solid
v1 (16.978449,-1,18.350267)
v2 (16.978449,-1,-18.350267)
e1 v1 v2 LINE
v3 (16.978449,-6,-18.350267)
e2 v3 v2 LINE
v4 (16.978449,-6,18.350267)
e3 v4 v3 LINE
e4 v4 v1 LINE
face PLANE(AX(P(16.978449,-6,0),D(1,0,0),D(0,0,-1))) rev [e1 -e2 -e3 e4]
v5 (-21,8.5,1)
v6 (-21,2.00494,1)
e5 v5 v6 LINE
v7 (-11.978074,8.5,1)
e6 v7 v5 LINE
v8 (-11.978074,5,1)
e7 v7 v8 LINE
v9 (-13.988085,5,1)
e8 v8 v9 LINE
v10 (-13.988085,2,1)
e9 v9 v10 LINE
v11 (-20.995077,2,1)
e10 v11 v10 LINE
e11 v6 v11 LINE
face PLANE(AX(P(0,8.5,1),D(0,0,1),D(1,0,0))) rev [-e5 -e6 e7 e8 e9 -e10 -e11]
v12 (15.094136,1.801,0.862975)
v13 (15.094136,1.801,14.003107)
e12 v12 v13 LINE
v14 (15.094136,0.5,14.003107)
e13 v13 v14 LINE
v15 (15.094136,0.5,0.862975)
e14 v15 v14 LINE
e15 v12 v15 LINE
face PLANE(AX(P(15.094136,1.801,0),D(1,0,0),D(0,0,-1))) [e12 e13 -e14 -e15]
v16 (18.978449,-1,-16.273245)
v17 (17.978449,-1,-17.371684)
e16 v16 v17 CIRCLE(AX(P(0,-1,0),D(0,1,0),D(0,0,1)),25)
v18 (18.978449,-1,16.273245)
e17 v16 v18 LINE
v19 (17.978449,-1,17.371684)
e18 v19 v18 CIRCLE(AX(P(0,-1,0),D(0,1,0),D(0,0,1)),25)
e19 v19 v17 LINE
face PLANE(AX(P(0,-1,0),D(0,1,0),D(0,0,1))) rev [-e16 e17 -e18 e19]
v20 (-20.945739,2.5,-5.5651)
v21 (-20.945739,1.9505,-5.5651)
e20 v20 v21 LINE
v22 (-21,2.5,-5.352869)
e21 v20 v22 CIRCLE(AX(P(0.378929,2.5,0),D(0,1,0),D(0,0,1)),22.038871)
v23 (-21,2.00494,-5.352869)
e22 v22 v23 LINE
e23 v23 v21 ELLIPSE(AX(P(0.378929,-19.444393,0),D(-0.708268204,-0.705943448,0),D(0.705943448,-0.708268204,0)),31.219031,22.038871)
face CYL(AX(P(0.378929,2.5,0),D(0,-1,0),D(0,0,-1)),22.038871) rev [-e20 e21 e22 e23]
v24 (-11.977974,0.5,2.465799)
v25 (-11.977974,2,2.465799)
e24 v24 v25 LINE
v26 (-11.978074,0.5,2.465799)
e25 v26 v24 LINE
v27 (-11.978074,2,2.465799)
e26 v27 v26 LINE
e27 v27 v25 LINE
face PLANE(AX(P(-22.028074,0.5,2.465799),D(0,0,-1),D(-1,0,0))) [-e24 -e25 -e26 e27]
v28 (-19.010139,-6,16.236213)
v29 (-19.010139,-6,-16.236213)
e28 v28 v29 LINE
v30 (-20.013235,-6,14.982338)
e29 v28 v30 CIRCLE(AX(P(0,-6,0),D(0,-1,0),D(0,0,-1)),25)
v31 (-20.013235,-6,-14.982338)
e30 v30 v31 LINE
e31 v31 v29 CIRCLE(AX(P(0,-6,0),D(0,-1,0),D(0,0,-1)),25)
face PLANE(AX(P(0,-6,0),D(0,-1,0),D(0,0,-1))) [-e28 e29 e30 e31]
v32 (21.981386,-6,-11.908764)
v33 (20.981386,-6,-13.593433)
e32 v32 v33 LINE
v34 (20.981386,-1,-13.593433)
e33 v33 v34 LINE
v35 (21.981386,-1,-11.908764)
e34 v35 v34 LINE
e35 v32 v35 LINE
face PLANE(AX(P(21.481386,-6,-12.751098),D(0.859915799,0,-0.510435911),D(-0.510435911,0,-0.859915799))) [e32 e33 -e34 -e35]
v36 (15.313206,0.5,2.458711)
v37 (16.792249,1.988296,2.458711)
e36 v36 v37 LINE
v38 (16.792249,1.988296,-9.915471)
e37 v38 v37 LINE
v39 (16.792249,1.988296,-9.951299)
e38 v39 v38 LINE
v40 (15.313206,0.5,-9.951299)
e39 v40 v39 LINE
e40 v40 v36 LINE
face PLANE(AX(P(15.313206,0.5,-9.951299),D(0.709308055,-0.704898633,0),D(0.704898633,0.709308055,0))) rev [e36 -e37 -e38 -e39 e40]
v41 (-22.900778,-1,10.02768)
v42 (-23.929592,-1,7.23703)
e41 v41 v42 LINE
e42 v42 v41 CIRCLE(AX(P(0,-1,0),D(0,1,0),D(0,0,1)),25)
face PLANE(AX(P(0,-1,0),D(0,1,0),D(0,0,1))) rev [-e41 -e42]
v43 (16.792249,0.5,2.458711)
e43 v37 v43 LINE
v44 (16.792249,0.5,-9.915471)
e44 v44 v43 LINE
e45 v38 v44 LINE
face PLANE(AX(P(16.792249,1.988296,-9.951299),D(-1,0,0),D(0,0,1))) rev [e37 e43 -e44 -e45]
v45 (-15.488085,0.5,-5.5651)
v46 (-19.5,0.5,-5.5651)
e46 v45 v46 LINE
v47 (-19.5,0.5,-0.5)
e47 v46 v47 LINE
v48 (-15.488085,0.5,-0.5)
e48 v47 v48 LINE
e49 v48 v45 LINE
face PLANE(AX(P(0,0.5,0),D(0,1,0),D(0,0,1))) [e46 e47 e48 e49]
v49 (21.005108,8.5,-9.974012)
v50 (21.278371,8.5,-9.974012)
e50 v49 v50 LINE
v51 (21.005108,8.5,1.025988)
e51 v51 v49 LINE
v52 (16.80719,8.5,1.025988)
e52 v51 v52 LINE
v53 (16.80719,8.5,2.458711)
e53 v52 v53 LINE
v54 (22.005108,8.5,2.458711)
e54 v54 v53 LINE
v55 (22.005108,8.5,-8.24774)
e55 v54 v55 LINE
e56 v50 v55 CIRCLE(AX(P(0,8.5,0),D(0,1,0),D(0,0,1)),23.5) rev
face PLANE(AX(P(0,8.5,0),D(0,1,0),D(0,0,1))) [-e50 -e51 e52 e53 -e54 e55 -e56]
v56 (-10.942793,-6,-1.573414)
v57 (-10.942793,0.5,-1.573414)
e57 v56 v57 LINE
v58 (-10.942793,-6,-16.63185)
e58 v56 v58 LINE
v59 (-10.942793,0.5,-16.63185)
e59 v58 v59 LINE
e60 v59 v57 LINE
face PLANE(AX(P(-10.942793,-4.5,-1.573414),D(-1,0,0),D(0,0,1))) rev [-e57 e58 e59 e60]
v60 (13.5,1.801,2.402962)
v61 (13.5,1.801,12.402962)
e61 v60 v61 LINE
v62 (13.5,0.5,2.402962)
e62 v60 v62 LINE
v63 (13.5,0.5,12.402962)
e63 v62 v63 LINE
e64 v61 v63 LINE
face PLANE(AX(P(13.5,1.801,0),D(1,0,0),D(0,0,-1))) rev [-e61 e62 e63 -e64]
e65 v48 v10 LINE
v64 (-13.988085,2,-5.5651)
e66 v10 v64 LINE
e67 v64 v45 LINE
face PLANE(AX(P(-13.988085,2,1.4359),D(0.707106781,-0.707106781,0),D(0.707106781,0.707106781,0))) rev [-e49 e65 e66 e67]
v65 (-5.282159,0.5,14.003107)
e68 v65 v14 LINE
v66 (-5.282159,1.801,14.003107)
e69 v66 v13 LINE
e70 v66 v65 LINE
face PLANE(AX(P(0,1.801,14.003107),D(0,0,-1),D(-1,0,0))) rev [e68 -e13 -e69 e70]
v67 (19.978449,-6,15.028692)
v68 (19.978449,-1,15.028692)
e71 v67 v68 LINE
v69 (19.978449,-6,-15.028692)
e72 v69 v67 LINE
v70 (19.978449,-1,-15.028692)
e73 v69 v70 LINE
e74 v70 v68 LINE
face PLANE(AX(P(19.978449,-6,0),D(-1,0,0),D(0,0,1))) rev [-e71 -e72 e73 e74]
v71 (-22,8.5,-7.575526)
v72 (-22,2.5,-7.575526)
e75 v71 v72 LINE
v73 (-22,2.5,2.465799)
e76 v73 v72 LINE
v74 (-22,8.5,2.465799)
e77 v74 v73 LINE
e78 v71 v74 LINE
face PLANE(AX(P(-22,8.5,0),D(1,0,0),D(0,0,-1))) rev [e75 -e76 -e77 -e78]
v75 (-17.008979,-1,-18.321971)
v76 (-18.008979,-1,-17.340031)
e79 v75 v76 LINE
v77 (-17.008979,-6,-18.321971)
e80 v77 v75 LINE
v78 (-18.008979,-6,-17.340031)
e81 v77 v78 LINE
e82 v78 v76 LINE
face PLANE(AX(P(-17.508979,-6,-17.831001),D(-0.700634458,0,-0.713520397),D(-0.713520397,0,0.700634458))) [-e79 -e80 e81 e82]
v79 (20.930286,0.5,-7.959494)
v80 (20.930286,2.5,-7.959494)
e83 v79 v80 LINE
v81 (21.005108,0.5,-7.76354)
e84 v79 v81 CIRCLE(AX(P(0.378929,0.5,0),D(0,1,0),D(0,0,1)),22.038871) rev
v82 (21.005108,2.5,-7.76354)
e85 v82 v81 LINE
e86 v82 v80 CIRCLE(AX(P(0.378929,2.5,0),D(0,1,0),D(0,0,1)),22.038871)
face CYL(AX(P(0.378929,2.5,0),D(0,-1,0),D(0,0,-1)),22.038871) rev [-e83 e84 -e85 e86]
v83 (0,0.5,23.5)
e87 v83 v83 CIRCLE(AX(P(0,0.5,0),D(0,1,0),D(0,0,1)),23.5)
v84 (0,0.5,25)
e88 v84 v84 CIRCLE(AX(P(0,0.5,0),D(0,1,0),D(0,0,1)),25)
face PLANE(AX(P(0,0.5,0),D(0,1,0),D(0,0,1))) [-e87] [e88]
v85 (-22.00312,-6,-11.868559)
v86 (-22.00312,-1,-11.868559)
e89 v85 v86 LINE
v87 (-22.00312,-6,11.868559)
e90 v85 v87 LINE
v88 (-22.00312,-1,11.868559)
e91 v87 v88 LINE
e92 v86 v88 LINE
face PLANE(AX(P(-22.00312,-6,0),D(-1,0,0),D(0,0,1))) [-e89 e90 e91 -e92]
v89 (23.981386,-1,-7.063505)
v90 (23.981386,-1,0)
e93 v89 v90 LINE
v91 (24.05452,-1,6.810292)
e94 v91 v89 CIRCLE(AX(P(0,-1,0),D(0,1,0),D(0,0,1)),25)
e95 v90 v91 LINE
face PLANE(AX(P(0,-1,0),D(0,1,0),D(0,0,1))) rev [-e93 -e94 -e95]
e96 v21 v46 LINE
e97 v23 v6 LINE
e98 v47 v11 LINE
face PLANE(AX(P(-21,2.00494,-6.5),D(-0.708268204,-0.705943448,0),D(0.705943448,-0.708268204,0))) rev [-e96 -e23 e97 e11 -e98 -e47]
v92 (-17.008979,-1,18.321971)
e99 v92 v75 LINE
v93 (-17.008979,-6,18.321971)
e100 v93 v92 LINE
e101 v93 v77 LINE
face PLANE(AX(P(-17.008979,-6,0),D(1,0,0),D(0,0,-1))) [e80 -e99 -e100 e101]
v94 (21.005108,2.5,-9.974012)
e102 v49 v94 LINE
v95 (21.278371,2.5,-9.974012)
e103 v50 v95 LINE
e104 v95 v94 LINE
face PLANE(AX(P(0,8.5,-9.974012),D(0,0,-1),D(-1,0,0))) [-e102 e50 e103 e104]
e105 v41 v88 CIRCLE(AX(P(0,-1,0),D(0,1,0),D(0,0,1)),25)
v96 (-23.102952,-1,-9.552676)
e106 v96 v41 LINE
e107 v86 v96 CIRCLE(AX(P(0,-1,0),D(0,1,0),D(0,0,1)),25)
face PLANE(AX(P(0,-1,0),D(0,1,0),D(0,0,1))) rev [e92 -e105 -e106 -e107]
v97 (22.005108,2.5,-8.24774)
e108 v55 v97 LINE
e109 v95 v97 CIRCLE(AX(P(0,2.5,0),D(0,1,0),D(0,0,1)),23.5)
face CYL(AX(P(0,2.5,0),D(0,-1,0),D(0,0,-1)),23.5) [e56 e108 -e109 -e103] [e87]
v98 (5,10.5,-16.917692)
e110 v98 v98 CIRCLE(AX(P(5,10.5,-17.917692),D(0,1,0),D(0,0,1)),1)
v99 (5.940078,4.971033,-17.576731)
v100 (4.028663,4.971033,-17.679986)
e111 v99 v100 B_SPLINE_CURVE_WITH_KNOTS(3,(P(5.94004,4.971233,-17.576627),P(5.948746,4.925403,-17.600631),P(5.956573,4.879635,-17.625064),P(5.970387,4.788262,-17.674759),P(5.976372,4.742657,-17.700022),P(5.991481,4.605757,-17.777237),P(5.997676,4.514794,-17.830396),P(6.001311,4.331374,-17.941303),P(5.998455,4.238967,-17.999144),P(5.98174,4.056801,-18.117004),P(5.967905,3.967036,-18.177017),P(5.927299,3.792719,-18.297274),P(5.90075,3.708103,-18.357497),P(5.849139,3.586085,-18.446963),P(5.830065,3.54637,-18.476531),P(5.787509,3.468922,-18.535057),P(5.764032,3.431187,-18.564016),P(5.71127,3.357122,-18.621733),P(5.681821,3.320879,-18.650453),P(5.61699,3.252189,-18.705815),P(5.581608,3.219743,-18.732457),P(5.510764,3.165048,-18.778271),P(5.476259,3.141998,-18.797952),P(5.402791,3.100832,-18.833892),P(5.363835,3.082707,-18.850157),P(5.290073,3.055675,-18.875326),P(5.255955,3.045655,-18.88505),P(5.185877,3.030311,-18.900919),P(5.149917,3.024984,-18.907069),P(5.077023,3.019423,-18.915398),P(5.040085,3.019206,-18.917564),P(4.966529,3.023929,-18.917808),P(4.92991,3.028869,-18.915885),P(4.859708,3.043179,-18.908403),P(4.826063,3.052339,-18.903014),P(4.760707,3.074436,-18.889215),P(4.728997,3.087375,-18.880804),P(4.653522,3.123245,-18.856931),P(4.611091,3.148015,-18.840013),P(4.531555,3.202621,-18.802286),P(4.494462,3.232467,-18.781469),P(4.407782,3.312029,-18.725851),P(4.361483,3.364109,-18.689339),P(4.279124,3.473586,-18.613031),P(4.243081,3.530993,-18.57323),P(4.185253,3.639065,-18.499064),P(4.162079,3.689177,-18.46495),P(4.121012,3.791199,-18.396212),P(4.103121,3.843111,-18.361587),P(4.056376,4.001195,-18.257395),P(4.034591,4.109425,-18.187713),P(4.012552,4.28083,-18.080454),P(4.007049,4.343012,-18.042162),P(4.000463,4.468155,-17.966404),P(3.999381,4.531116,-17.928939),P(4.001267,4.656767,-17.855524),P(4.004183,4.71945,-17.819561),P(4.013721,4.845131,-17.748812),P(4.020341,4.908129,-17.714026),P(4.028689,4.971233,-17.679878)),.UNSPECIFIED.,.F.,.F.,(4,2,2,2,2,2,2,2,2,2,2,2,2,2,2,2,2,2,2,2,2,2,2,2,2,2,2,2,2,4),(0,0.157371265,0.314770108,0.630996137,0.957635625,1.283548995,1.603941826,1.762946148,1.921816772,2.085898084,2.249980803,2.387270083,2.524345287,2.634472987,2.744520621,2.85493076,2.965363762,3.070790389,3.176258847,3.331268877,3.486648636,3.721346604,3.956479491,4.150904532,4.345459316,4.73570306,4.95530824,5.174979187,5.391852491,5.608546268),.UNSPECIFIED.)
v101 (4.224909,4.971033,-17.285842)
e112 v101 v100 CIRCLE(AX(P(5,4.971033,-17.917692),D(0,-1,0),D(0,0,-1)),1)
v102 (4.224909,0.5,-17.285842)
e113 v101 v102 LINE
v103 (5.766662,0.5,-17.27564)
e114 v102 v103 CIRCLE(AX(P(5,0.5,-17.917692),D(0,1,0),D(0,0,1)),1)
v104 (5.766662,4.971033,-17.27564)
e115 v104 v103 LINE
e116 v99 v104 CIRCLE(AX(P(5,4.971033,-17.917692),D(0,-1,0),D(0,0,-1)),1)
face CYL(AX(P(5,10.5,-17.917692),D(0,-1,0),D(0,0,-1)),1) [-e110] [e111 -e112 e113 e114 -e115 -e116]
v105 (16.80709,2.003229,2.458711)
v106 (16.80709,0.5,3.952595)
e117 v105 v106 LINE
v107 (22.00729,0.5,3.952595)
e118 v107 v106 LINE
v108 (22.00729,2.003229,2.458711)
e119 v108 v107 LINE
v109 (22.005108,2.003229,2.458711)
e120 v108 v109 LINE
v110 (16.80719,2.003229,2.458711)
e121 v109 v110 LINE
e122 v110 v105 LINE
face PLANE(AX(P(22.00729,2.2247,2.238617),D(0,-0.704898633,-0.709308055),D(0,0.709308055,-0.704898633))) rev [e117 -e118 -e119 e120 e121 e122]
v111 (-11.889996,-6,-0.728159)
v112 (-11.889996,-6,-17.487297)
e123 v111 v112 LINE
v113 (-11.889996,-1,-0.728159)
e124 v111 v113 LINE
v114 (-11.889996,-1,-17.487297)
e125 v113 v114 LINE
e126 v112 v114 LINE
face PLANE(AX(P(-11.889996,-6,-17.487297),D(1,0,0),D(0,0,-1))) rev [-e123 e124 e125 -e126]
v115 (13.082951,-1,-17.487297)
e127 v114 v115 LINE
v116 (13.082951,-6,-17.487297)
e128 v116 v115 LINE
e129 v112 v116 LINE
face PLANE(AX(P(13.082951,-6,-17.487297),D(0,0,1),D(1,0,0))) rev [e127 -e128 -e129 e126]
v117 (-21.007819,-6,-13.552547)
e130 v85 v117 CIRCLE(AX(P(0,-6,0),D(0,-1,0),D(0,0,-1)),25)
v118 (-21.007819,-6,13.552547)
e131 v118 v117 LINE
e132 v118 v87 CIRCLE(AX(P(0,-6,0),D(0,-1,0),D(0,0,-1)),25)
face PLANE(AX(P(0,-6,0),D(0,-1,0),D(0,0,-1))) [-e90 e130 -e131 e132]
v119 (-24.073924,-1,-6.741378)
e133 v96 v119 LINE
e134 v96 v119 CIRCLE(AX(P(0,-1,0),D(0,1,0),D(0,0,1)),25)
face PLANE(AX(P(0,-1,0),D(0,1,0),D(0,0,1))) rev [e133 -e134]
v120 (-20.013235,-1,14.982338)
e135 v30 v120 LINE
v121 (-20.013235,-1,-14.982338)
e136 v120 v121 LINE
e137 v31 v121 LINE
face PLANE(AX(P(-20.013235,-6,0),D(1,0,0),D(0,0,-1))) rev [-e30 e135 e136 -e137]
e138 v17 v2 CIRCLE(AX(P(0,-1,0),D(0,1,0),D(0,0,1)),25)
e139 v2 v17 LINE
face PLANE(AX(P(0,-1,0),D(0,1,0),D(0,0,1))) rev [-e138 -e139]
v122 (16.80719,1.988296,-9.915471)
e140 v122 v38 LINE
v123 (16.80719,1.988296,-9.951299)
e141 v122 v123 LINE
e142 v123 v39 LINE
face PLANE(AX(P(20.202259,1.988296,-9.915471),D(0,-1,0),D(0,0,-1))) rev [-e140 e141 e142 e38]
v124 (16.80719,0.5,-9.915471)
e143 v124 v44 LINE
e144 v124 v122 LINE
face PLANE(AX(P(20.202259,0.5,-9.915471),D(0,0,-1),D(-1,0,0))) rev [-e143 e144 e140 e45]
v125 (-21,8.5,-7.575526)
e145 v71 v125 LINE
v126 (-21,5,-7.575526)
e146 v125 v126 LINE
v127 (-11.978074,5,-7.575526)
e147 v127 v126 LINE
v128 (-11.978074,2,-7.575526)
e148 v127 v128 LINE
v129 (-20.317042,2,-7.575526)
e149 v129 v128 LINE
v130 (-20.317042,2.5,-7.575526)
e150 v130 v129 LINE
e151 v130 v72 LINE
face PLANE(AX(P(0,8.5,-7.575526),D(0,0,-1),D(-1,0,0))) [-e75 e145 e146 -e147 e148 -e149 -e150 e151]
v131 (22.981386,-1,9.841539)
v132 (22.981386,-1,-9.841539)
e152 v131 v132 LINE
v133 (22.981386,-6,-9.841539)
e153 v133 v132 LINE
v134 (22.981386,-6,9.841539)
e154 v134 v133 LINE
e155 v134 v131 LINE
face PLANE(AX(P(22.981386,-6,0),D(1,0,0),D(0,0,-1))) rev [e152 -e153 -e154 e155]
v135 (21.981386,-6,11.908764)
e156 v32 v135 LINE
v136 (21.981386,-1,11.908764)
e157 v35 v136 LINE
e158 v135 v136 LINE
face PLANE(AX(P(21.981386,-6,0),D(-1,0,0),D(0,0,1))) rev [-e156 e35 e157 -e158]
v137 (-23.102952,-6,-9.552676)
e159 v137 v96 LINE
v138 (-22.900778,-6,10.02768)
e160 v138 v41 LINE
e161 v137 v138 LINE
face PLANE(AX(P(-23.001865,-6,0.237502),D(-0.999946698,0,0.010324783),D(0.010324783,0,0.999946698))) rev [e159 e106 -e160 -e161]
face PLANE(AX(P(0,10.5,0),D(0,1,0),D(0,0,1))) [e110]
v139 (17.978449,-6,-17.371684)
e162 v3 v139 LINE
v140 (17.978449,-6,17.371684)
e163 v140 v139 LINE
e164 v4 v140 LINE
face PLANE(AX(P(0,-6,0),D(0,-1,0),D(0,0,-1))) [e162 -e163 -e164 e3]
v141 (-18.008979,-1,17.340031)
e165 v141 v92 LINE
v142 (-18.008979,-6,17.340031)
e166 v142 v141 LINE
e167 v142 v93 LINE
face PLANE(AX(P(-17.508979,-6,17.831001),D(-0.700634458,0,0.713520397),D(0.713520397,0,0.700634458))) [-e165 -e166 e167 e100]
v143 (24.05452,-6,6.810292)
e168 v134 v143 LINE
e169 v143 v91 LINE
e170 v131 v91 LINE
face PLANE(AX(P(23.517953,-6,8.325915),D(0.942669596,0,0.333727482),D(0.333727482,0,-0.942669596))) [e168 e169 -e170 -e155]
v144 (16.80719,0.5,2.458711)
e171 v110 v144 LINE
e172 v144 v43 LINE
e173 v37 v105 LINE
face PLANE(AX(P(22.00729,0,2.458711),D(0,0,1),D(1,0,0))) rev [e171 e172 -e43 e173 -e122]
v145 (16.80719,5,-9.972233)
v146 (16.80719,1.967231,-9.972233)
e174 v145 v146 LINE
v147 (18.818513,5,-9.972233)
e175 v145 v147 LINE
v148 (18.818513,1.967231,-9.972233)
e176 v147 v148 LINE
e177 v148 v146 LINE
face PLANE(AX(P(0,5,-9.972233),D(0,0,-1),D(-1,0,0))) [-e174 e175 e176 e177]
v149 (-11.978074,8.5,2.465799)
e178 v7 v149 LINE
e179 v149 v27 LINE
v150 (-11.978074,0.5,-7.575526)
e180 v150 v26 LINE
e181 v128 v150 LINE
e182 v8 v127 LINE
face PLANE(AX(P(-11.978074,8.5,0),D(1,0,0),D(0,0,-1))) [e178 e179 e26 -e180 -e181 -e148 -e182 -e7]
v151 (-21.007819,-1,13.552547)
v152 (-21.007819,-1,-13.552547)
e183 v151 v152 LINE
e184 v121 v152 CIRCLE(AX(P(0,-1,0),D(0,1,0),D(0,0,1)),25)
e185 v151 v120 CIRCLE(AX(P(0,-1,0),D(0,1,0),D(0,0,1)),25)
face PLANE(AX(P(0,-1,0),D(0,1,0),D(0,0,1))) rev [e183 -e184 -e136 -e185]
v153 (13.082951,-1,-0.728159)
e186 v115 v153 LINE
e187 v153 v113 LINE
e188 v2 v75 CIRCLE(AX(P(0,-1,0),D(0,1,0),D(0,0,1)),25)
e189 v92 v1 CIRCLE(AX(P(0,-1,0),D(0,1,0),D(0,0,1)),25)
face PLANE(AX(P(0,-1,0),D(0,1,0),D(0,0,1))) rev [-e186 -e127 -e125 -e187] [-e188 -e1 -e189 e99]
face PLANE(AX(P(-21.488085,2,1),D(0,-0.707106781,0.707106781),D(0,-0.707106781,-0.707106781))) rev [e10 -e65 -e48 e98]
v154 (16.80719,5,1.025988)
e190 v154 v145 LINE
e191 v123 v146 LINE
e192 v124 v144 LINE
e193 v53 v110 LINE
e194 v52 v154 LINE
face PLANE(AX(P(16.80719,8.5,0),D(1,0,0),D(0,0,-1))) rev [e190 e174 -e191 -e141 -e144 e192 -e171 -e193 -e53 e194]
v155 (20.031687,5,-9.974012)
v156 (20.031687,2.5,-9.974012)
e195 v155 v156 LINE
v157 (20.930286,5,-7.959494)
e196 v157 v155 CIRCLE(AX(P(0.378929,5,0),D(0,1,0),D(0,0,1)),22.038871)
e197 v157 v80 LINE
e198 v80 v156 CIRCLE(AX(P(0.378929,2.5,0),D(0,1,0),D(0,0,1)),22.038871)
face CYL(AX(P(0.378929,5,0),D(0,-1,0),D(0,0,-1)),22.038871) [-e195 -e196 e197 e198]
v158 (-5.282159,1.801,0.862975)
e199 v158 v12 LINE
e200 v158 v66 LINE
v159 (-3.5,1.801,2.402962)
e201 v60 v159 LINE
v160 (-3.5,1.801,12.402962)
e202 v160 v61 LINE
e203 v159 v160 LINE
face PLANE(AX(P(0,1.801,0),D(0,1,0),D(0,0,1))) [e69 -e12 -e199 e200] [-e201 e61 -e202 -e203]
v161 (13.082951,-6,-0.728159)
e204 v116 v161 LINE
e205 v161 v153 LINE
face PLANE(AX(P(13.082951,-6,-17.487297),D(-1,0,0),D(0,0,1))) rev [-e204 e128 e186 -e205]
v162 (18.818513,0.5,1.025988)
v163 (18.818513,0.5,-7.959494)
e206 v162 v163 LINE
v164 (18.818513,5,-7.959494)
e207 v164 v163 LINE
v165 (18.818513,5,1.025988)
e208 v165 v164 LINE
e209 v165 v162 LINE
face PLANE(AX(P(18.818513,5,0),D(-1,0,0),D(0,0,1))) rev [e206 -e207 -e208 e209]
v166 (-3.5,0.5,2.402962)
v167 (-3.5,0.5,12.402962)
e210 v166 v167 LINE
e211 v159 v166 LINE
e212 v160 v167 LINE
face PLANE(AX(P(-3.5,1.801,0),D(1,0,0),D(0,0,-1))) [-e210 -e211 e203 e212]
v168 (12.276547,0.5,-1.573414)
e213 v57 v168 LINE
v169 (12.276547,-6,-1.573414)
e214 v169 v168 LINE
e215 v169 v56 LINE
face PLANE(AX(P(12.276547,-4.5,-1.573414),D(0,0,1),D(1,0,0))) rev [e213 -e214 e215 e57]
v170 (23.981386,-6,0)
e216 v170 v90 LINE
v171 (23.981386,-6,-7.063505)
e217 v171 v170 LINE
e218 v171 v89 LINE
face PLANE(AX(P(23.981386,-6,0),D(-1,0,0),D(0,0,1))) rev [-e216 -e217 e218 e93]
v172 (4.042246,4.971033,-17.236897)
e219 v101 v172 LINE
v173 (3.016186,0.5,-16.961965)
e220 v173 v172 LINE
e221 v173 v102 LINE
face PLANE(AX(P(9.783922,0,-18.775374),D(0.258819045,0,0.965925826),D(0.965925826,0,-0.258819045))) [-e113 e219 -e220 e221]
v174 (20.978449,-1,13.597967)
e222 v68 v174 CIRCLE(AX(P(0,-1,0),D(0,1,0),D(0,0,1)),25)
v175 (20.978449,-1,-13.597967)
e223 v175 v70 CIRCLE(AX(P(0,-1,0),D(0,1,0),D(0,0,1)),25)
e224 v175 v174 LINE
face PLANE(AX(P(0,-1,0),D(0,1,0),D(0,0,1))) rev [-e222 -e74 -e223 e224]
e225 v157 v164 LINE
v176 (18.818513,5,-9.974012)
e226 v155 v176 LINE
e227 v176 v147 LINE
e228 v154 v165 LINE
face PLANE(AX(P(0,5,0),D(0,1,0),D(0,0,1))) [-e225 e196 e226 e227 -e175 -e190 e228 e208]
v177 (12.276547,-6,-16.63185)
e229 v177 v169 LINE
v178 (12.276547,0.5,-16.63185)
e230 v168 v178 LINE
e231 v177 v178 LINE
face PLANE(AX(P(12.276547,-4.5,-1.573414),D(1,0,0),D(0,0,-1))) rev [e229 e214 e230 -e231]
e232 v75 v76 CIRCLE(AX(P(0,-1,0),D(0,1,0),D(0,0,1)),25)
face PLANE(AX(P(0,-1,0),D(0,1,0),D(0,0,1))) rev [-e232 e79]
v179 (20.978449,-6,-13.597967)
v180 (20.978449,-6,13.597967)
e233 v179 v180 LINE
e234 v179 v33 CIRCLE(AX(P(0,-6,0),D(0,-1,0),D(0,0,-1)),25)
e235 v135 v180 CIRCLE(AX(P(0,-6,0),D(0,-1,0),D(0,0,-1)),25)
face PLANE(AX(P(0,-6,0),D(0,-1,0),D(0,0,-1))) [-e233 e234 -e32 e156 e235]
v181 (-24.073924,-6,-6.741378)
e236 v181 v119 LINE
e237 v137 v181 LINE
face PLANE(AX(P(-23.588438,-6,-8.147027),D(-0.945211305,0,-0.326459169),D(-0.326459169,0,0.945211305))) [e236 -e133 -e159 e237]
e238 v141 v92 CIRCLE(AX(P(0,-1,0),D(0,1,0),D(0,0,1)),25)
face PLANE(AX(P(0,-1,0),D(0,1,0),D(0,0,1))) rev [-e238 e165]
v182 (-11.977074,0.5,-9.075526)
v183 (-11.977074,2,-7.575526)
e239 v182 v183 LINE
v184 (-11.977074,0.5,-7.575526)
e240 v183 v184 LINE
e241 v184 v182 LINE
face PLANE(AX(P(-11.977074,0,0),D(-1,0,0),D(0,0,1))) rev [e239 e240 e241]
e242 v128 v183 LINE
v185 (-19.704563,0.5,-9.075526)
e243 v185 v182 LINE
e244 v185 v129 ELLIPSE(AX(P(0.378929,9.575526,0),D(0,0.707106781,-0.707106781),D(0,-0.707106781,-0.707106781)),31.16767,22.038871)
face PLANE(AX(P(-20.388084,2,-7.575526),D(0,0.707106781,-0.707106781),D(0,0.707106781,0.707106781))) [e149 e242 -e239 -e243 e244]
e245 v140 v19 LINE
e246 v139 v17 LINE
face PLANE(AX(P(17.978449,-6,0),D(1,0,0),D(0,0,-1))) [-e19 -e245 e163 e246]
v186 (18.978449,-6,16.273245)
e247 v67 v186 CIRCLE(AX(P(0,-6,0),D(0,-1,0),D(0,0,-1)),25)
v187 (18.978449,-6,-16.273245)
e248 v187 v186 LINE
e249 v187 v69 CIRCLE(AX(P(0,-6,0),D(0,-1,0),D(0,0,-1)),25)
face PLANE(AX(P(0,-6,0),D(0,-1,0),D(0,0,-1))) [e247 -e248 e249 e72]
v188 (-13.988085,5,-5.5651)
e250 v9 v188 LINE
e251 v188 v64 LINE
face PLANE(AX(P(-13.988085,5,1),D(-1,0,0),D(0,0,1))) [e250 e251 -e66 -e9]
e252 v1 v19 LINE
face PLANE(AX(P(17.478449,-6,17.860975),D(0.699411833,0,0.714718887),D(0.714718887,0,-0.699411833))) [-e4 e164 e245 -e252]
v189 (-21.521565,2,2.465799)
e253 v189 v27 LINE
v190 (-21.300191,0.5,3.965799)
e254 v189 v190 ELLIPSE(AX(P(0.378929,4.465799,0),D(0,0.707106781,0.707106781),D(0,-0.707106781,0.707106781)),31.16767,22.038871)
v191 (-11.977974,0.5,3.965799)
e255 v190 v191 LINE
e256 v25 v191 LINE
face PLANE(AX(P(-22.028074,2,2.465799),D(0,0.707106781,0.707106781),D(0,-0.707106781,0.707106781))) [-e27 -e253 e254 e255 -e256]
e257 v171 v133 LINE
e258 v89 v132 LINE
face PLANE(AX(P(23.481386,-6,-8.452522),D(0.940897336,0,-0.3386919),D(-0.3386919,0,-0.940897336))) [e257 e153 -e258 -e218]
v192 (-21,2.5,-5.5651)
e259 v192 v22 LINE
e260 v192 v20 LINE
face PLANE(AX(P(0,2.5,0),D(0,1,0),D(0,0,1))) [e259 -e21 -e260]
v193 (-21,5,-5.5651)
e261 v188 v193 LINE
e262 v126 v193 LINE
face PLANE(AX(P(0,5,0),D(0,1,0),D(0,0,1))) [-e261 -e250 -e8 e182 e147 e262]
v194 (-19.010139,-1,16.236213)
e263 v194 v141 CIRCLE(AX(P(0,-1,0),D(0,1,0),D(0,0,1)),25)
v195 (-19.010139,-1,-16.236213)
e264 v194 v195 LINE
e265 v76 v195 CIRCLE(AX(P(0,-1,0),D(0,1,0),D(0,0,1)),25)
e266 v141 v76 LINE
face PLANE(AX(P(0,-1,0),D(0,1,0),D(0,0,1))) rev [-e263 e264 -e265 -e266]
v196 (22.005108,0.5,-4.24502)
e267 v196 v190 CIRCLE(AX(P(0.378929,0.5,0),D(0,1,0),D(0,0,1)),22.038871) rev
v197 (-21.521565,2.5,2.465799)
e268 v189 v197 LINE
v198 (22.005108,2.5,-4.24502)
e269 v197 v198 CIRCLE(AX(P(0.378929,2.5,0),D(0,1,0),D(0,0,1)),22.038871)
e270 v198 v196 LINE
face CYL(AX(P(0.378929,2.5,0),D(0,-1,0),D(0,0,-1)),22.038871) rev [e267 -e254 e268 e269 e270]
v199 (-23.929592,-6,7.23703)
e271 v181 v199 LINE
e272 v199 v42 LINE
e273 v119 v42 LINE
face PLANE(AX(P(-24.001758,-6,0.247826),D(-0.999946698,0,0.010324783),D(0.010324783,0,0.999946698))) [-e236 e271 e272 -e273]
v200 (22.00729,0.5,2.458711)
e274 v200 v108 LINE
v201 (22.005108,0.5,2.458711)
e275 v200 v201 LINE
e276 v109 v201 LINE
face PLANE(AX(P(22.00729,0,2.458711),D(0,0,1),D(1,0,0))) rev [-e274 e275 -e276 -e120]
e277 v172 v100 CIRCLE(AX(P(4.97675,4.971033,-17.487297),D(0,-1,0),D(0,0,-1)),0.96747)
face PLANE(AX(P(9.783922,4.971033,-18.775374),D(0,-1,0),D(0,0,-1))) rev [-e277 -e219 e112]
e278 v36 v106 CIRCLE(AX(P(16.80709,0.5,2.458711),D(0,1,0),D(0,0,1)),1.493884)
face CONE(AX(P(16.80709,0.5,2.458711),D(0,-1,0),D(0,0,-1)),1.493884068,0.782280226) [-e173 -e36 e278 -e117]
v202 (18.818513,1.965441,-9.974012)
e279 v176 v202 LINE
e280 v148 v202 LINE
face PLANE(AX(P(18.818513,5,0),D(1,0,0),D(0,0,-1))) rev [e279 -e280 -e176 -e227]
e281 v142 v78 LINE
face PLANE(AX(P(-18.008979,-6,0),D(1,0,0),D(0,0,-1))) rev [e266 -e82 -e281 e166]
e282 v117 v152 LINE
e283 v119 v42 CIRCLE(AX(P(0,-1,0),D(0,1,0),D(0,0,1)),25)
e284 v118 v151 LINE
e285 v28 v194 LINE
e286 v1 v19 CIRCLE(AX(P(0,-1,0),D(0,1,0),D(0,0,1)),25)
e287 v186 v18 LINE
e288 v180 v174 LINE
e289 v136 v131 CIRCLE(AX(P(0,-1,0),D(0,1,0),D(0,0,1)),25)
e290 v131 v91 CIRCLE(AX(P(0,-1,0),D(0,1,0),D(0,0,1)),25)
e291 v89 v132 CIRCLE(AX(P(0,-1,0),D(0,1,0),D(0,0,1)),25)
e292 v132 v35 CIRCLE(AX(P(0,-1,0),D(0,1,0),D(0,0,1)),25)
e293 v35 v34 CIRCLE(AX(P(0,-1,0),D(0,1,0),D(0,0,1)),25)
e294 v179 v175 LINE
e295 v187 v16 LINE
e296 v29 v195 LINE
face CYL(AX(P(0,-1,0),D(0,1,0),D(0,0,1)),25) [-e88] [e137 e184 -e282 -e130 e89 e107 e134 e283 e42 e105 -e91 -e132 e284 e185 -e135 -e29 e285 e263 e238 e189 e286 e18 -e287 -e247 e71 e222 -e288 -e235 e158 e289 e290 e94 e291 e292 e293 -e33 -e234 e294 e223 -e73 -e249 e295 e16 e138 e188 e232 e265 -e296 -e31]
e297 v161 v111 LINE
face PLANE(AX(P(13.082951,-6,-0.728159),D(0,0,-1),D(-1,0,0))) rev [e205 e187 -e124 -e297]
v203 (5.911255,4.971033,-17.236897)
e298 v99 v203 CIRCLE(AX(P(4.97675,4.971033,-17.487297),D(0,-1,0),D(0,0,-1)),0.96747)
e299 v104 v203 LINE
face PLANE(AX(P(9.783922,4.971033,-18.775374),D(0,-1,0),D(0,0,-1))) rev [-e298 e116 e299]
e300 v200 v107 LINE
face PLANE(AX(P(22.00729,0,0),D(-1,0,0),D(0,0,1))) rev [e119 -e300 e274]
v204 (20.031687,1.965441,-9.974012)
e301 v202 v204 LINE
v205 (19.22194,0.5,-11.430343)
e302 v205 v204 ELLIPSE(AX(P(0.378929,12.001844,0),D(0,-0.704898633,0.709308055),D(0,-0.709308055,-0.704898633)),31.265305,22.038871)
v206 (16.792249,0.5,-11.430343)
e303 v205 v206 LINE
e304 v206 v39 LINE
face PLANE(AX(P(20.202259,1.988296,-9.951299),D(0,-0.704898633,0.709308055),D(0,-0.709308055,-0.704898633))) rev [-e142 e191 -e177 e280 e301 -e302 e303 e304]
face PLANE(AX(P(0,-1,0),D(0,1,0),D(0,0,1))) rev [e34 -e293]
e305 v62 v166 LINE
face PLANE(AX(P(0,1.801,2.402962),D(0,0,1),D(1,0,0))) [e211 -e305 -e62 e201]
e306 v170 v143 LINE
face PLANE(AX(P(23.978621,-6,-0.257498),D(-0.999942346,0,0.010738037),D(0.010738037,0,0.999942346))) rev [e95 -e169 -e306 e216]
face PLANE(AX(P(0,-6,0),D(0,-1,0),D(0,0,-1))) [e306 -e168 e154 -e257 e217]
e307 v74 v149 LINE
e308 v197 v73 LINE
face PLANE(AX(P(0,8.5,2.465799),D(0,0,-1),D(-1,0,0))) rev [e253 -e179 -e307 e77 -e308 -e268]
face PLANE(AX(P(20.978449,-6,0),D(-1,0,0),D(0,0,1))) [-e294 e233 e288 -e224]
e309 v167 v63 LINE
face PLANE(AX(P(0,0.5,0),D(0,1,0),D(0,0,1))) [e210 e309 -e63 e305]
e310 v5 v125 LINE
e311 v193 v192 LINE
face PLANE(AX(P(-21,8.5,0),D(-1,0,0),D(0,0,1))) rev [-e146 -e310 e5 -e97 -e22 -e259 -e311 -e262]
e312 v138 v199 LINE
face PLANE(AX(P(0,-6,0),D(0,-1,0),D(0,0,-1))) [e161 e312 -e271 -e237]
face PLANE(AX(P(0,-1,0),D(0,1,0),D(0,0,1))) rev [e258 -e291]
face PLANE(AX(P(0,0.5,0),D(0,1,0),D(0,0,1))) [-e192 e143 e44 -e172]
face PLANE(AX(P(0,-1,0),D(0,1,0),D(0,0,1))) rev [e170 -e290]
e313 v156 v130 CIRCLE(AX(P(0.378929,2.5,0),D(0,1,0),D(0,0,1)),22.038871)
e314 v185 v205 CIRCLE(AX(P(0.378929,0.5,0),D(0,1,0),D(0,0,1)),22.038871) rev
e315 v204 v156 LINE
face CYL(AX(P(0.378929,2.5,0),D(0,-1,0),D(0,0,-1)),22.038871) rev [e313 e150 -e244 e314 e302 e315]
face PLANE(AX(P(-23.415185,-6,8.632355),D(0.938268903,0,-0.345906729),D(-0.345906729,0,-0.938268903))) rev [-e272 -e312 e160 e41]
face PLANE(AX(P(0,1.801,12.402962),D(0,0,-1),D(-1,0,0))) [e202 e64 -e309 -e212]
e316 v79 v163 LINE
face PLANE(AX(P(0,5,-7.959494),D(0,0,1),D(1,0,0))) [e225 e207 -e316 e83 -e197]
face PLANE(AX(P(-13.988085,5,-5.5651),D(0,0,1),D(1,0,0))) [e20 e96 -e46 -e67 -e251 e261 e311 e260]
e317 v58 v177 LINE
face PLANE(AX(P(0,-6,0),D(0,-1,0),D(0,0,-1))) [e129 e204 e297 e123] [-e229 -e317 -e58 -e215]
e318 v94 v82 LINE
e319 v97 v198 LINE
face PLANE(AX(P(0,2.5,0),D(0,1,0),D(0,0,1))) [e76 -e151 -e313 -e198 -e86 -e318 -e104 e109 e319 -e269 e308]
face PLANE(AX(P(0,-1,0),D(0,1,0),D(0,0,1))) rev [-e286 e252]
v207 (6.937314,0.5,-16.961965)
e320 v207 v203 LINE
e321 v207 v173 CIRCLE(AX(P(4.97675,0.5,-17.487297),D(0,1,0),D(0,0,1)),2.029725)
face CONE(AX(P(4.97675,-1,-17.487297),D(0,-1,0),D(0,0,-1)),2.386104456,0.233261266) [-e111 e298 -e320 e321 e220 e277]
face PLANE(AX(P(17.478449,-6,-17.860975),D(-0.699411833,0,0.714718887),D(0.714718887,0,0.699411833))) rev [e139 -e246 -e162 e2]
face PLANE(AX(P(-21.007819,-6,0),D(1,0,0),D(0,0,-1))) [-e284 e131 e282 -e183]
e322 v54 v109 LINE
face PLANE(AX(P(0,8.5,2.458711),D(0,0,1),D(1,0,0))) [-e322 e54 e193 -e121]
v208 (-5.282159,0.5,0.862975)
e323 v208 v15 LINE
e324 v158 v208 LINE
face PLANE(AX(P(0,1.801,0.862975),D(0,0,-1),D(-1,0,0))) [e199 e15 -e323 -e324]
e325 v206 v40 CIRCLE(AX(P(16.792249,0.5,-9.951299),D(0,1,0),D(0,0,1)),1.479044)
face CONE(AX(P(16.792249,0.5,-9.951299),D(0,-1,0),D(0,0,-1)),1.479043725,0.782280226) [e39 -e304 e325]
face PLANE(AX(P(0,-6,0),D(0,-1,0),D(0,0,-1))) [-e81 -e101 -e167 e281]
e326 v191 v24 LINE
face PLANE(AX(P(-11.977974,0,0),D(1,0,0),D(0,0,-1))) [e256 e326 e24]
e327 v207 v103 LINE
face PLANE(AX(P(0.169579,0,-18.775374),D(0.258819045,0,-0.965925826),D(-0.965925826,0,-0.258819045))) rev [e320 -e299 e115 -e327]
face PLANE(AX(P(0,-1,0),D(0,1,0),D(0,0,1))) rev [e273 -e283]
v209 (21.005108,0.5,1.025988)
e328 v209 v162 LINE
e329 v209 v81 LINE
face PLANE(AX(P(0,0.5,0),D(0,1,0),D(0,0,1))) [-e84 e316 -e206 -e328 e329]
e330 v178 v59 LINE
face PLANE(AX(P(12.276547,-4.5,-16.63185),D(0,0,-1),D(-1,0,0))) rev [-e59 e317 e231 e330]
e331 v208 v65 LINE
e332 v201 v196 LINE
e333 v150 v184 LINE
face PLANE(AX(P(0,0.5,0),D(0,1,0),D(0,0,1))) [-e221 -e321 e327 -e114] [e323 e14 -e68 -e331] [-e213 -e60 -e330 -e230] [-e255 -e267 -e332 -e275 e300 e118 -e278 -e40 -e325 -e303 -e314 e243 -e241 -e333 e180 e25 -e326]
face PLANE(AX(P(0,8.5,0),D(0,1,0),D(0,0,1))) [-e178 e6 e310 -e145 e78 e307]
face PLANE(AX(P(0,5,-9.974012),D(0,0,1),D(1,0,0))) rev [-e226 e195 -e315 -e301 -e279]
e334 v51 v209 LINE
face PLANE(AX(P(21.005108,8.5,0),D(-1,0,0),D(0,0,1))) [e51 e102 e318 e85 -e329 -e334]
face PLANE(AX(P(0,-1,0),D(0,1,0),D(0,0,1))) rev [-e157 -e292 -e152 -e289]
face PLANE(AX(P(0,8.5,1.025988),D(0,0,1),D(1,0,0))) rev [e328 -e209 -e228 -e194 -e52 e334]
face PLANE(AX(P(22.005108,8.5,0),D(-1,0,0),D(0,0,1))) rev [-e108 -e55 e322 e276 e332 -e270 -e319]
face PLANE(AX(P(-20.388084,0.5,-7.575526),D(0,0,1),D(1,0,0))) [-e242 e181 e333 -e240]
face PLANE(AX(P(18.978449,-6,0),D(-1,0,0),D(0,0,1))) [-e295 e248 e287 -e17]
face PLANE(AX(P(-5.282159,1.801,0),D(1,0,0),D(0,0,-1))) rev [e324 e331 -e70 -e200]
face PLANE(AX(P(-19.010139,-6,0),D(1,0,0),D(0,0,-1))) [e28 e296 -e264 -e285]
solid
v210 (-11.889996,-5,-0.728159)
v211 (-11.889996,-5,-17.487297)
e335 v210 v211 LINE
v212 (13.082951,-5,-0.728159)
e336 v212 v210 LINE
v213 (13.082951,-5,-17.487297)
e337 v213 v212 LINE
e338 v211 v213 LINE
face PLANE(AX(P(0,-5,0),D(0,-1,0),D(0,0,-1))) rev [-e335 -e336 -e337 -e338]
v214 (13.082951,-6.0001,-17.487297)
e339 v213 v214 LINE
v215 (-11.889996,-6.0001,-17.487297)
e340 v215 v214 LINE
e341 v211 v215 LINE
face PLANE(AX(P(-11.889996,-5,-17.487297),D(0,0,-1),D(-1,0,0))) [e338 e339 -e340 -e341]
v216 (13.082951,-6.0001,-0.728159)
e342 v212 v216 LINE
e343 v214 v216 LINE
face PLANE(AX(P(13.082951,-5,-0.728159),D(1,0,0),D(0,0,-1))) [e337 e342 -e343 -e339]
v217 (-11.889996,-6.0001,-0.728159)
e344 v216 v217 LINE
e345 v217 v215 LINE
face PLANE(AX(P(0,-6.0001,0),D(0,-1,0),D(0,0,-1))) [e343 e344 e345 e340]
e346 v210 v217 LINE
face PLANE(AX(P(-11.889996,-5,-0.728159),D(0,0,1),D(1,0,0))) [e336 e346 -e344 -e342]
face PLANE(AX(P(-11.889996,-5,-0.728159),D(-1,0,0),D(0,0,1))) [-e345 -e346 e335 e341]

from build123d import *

# Parameters (mm, degrees)
BOSS_EXTRUDE1_DEPTH       = 0.5
BOSS_EXTRUDE1_DEPTH_BACK  = 1
SKETCH1_R                 = 25
SKETCH17_R                = 23.5
SKETCH17_R_2              = 22.038870545
BOSS_EXTRUDE15_DEPTH      = 2
SKETCH2_R                 = 1
BOSS_EXTRUDE2_DEPTH       = 10
BOSS_EXTRUDE11_DEPTH      = 5
SKETCH12_W                = 23.219340148
SKETCH12_H                = 15.058436642
CUT_EXTRUDE2_DEPTH        = 5
SKETCH15_W                = 24.972946701
SKETCH15_H                = 16.75913787
SKETCH15_W_2              = 23.219340148
SKETCH15_H_2              = 15.058436642
BOSS_EXTRUDE13_DEPTH      = 5
BOSS_EXTRUDE14_DEPTH      = 0.0001
BOSS_EXTRUDE14_DEPTH_BACK = 1
SKETCH16_W                = 24.972946701
SKETCH16_H                = 16.75913787
BOSS_EXTRUDE16_DEPTH      = 8
BOSS_EXTRUDE17_DEPTH      = 1.301
BOSS_EXTRUDE18_DEPTH      = 4.5
REVOLVE1_ANGLE            = 195
REVOLVE1_OTHER_WAY_ANGLE  = 15
BOSS_EXTRUDE20_DEPTH      = 7.5
BOSS_EXTRUDE21_DEPTH      = 7.5
BOSS_EXTRUDE22_DEPTH      = 0.0001
BOSS_EXTRUDE22_DEPTH_BACK = 10.05
BOSS_EXTRUDE23_DEPTH      = 0.0001
BOSS_EXTRUDE23_DEPTH_BACK = 5.2001
REVOLVE2_ANGLE            = 90
BOSS_EXTRUDE25_DEPTH      = 12.41001
REVOLVE3_ANGLE            = 90
BOSS_EXTRUDE26_DEPTH      = 3.41001
BOSS_EXTRUDE27_DEPTH      = 0.001
BOSS_EXTRUDE27_DEPTH_BACK = 8.41001
BOSS_EXTRUDE28_DEPTH      = 7.001


# Read off the part's stored shape, not the designer's step: Boss-Extrude16, Boss-Extrude18
with BuildPart() as part:
    # Sketch1 → Boss-Extrude1 (new, two sides: drawn at the far end of the back side and taken through both)
    with BuildSketch(Plane(origin=(0, 0, 0), x_dir=(1, 0, 0), z_dir=(0, 1, 0)).offset(-BOSS_EXTRUDE1_DEPTH_BACK)):
        with Locations(Location((0, 0, 0), (0, 0, 270))):
            Circle(SKETCH1_R)
    extrude(amount=BOSS_EXTRUDE1_DEPTH + BOSS_EXTRUDE1_DEPTH_BACK)

    # Sketch17 → Boss-Extrude15 (add)
    with BuildSketch(Plane(origin=(0, 0.5, 0), x_dir=(1, 0, 0), z_dir=(0, 1, 0))):
        with Locations(Location((0, 0, 0), (0, 0, 270))):
            Circle(SKETCH17_R)
        with Locations(Location((0.378928968, 0, 0), (0, 0, 270))):
            Circle(SKETCH17_R_2, mode=Mode.SUBTRACT)
    extrude(amount=BOSS_EXTRUDE15_DEPTH)

    # Sketch2 → Boss-Extrude2 (add)
    with BuildSketch(Plane(origin=(0, 0.5, 0), x_dir=(1, 0, 0), z_dir=(0, 1, 0))):
        with Locations(Location((5, 17.917691699, 0), (0, 0, 270))):
            Circle(SKETCH2_R)
    extrude(amount=BOSS_EXTRUDE2_DEPTH)

    # Sketch14 → Boss-Extrude11 (add)
    with BuildSketch(Plane.XZ.offset(1)):
        with BuildLine():
            Line((-20.013234661, 0), (-20.013234661, -14.982337549))
            ThreePointArc((-20.013234661, -14.982337549), (-19.5217563, -15.617331109), (-19.01013874, -16.236213385))
            Line((-19.01013874, -16.236213385), (-19.01013874, 0))
            Line((-19.01013874, 0), (-20.013234661, 0))
        make_face()
        with BuildLine():
            ThreePointArc((-19.01013874, 16.236213385), (-19.5217563, 15.617331109), (-20.013234661, 14.982337549))
            Line((-20.013234661, 14.982337549), (-20.013234661, 14.219543585))
            Line((-20.013234661, 14.219543585), (-20.013234661, 0))
            Line((-20.013234661, 0), (-19.01013874, 0))
            Line((-19.01013874, 0), (-19.01013874, 16.236213385))
        make_face()
        with BuildLine():
            Line((-22.003120492, 11.868558827), (-22.003120492, 0))
            Line((-22.003120492, 0), (-22.003120492, -11.868558827))
            ThreePointArc((-22.003120492, -11.868558827), (-21.521946756, -12.720291185), (-21.007819435, -13.552546719))
            Line((-21.007819435, -13.552546719), (-21.007819435, 0))
            Line((-21.007819435, 0), (-21.007819435, 13.552546719))
            ThreePointArc((-21.007819435, 13.552546719), (-21.521946756, 12.720291185), (-22.003120492, 11.868558827))
        make_face()
        Polygon((-23.929592496, 7.237029985), (-24.00431724, 0), (-23.00431724, 0), (-22.900778107, 10.027679797), align=None)
        Polygon((-23.102951801, -9.552675963), (-24.07392421, -6.741377687), (-24.00431724, 0), (-23.00431724, 0), align=None)
        Polygon((16.978448552, 0), (16.978448552, -18.350266613), (17.978448552, -17.371683501), (17.978448552, 0), align=None)
        with BuildLine():
            ThreePointArc((19.978448552, 15.02869234), (19.488385916, 15.658953171), (18.978448552, 16.273244623))
            Line((18.978448552, 16.273244623), (18.978448552, 0))
            Line((18.978448552, 0), (19.978448552, 0))
            Line((19.978448552, 0), (19.978448552, 15.02869234))
        make_face()
        Polygon((17.978448552, 17.371683501), (16.978448552, 18.350266613), (16.978448552, 0), (17.978448552, 0), align=None)
        Polygon((21.981386368, 0), (21.981386368, 11.908763719), (20.981386368, 11.858054365), (20.981386368, 0), align=None)
        with BuildLine():
            Line((19.978448552, 0), (18.978448552, 0))
            Line((18.978448552, 0), (18.978448552, -16.273244623))
            ThreePointArc((18.978448552, -16.273244623), (19.488385916, -15.658953171), (19.978448552, -15.02869234))
            Line((19.978448552, -15.02869234), (19.978448552, 0))
        make_face()
        Polygon((21.981386368, 0), (21.981386368, -11.908763719), (20.981386368, -13.593433196), (20.981386368, 0), align=None)
        Polygon((23.981386368, -7.063505351), (23.981386368, 0), (22.981386368, 0), (22.981386368, -9.841538527), align=None)
        Polygon((24.054519754, 6.810292166), (22.981386368, 9.841538527), (22.981386368, 0), (23.981386368, 0), align=None)
        with BuildLine():
            ThreePointArc((21.981386368, 11.908763719), (21.49651613, 12.763220373), (20.978448552, 13.597966625))
            Line((20.978448552, 13.597966625), (20.978448552, 0))
            Line((20.978448552, 0), (20.978448552, -13.597966625))
            ThreePointArc((20.978448552, -13.597966625), (20.979917583, -13.59569999), (20.981386368, -13.593433196))
            Line((20.981386368, -13.593433196), (20.981386368, 0))
            Line((20.981386368, 0), (20.981386368, 11.858054365))
            Line((20.981386368, 11.858054365), (21.981386368, 11.908763719))
        make_face()
        Polygon((-17.008979136, -18.321971203), (-18.008979136, -17.340030867), (-18.008979136, 0), (-17.008979136, 0), align=None)
        Polygon((-18.008979136, 17.340030867), (-17.008979136, 18.321971203), (-17.008979136, 0), (-18.008979136, 0), align=None)
    extrude(amount=BOSS_EXTRUDE11_DEPTH)

    # Sketch12 → Cut-Extrude2 (cut)
    with BuildSketch(Plane(origin=(0, 0.5, 0), x_dir=(1, 0, 0), z_dir=(0, 1, 0))):
        with Locations((0.666876956, 9.102631979)):
            Rectangle(SKETCH12_W, SKETCH12_H)
    extrude(amount=-CUT_EXTRUDE2_DEPTH, mode=Mode.SUBTRACT)

    # Sketch15 → Boss-Extrude13 (add)
    with BuildSketch(Plane.XZ.offset(1)):
        with Locations((0.596477735, -9.107727728)):
            Rectangle(SKETCH15_W, SKETCH15_H)
        with Locations((0.666876956, -9.102631979)):
            Rectangle(SKETCH15_W_2, SKETCH15_H_2, mode=Mode.SUBTRACT)
    extrude(amount=BOSS_EXTRUDE13_DEPTH)

    # Boss-Extrude16 outline → Boss-Extrude16 (add)
    with BuildSketch(Plane(origin=(0, 0.5, 0), x_dir=(1, 0, 0), z_dir=(0, 1, 0))):
        with BuildLine():
            Line((21.278371263, 9.97401205), (21.005108017, 9.97401205))
            Line((21.005108017, 9.97401205), (21.005108017, -1.02598795))
            Line((21.005108017, -1.02598795), (16.80718978, -1.02598795))
            Line((16.80718978, -1.02598795), (16.80718978, -2.458711062))
            Line((16.80718978, -2.458711062), (22.005108017, -2.458711062))
            Line((22.005108017, -2.458711062), (22.005108017, 8.247740366))
            ThreePointArc((22.005108017, 8.247740366), (21.658944991, 9.118119425), (21.278371263, 9.97401205))
        make_face()
        Polygon((-22, -2.465798727), (-11.97807381, -2.465798727), (-11.97807381, -1), (-21, -1), (-21, 7.575525784), (-22, 7.575525784), align=None)
    extrude(amount=BOSS_EXTRUDE16_DEPTH)

    # Sketch18 → Boss-Extrude17 (add)
    with BuildSketch(Plane(origin=(0, 0.5, 0), x_dir=(1, 0, 0), z_dir=(0, 1, 0))):
        Polygon((0, -2.402962183), (0, -0.862974972), (-5.282158739, -0.862974972), (-5.282158739, -14.003106764), (0, -14.003106764), (0, -12.402962183), (-3.5, -12.402962183), (-3.5, -2.402962183), align=None)
        Polygon((15.094136196, -0.862974972), (0.201079682, -0.862974972), (0.559908327, -2.402962183), (13.5, -2.402962183), (13.5, -12.402962183), (2.889983811, -12.402962183), (3.262829577, -14.003106764), (15.094136196, -14.003106764), align=None)
        Polygon((2.889983811, -12.402962183), (0, -12.402962183), (0, -14.003106764), (3.262829577, -14.003106764), align=None)
        Polygon((0.201079682, -0.862974972), (0, -0.862974972), (0, -2.402962183), (0.559908327, -2.402962183), align=None)
    extrude(amount=BOSS_EXTRUDE17_DEPTH)

    # Boss-Extrude18 outline → Boss-Extrude18 (add)
    with BuildSketch(Plane(origin=(0, 0.5, 0), x_dir=(1, 0, 0), z_dir=(0, 1, 0))):
        with BuildLine():
            Line((16.80718978, 9.972233135), (16.80718978, -1.02598795))
            Line((16.80718978, -1.02598795), (18.818512993, -1.02598795))
            Line((18.818512993, -1.02598795), (18.818512993, 7.959494075))
            Line((18.818512993, 7.959494075), (20.930285832, 7.959494075))
            ThreePointArc((20.930285832, 7.959494075), (20.506206092, 8.978002587), (20.031687006, 9.97401205))
            Line((20.031687006, 9.97401205), (18.818512993, 9.97401205))
            Line((18.818512993, 9.97401205), (18.818512993, 9.972233135))
            Line((18.818512993, 9.972233135), (16.80718978, 9.972233135))
        make_face()
        Polygon((-13.988084857, -1), (-11.97807381, -1), (-11.97807381, 7.575525784), (-21, 7.575525784), (-21, 5.565099869), (-13.988084857, 5.565099869), align=None)
    extrude(amount=BOSS_EXTRUDE18_DEPTH)

    # Sketch22 → Revolve1 (revolve)
    with BuildSketch(Plane(origin=(0, 0, -17.487296663), x_dir=(-1, 0, 0), z_dir=(0, 0, -1))):
        Polygon((-4.976750106, 2.5), (-4.976750106, 4.97103297), (-5.944220353, 4.97103297), (-7.362854562, -1), (-4.976750106, -1), align=None)
    revolve(axis=Axis((4.976750106, 2.5, -17.487296663), (0, 1, 0)), revolution_arc=REVOLVE1_ANGLE)

    # Sketch22 → Revolve1 other way (revolve)
    with BuildSketch(Plane(origin=(0, 0, -17.487296663), x_dir=(-1, 0, 0), z_dir=(0, 0, -1))):
        Polygon((-4.976750106, 2.5), (-4.976750106, 4.97103297), (-5.944220353, 4.97103297), (-7.362854562, -1), (-4.976750106, -1), align=None)
    revolve(axis=Axis((4.976750106, 2.5, -17.487296663), (0, -1, 0)), revolution_arc=REVOLVE1_OTHER_WAY_ANGLE)

    # Sketch23 → Boss-Extrude20 (add)
    with BuildSketch(Plane(origin=(0, 0, 1), x_dir=(-1, 0, 0), z_dir=(0, 0, -1))):
        Polygon((21, 0.5), (21, 2.00493968), (19.5, 0.5), align=None)
    extrude(amount=BOSS_EXTRUDE20_DEPTH)

    # Sketch24 → Boss-Extrude21 (add)
    with BuildSketch(Plane.ZY.offset(13.988084857)):
        Polygon((1, 0.5), (1, 2), (-0.5, 0.5), align=None)
    extrude(amount=BOSS_EXTRUDE21_DEPTH)

    # Sketch25 → Boss-Extrude22 (add, two sides: drawn at the far end of the back side and taken through both)
    with BuildSketch(Plane(origin=(-11.97807381, 0, 0), x_dir=(0, 0, -1), z_dir=(1, 0, 0)).offset(-BOSS_EXTRUDE22_DEPTH_BACK)):
        Polygon((-2.465798727, 0.5), (-3.965798727, 0.5), (-2.465798727, 2), align=None)
    extrude(amount=BOSS_EXTRUDE22_DEPTH + BOSS_EXTRUDE22_DEPTH_BACK)

    # Sketch28 → Boss-Extrude23 (add, two sides: drawn at the far end of the back side and taken through both)
    with BuildSketch(Plane.ZY.offset(-16.80718978).offset(-BOSS_EXTRUDE23_DEPTH_BACK)):
        Polygon((2.458711062, 2.003228909), (2.458711062, 0.5), (3.95259513, 0.5), align=None)
    extrude(amount=BOSS_EXTRUDE23_DEPTH + BOSS_EXTRUDE23_DEPTH_BACK)

    # Sketch30 → Revolve2 (revolve)
    with BuildSketch(Plane.ZY.offset(-16.80708978)):
        Polygon((2.458711062, 2.003228909), (2.458711062, 0.5), (3.95259513, 0.5), align=None)
    revolve(axis=Axis((16.80708978, 2.003228909, 2.458711062), (0, -1, 0)), revolution_arc=REVOLVE2_ANGLE)

    # Sketch31 → Boss-Extrude25 (add)
    with BuildSketch(Plane(origin=(0, 0, 2.458711062), x_dir=(-1, 0, 0), z_dir=(0, 0, -1))):
        Polygon((-16.792249437, 1.988295734), (-16.792249437, 0.5), (-15.313205712, 0.5), align=None)
    extrude(amount=BOSS_EXTRUDE25_DEPTH)

    # Sketch32 → Revolve3 (revolve)
    with BuildSketch(Plane(origin=(0, 0, -9.951298938), x_dir=(-1, 0, 0), z_dir=(0, 0, -1))):
        Polygon((-16.792249437, 1.988295734), (-16.792249437, 0.5), (-15.313205712, 0.5), align=None)
    revolve(axis=Axis((16.792249437, 1.988295734, -9.951298938), (0, -1, 0)), revolution_arc=REVOLVE3_ANGLE)

    # Sketch33 → Boss-Extrude26 (add)
    with BuildSketch(Plane(origin=(16.792249437, 0, 0), x_dir=(0, 0, -1), z_dir=(1, 0, 0))):
        Polygon((9.951298938, 1.988295734), (11.430342663, 0.5), (9.951298938, 0.5), (9.915470666, 0.5), (9.915470666, 1.988295734), align=None)
    extrude(amount=BOSS_EXTRUDE26_DEPTH)

    # Sketch34 → Boss-Extrude27 (add, two sides: drawn at the far end of the back side and taken through both)
    with BuildSketch(Plane(origin=(-11.97807381, 0, 0), x_dir=(0, 0, -1), z_dir=(1, 0, 0)).offset(-BOSS_EXTRUDE27_DEPTH_BACK)):
        Polygon((7.575525784, 0.5), (9.075525784, 0.5), (7.575525784, 2), align=None)
    extrude(amount=BOSS_EXTRUDE27_DEPTH + BOSS_EXTRUDE27_DEPTH_BACK)

    # Sketch37 → Boss-Extrude28 (add)
    with BuildSketch(Plane.XY.offset(-5.565099869)):
        Polygon((-13.988084857, 0.5), (-13.988084857, 2), (-15.488084857, 0.5), align=None)
    extrude(amount=BOSS_EXTRUDE28_DEPTH)


with BuildPart() as body_2:
    # Sketch16 → Boss-Extrude14 (new, two sides: drawn at the far end of the back side and taken through both)
    with BuildSketch(Plane(origin=(0, -6, 0), x_dir=(-1, 0, 0), z_dir=(0, -1, 0)).offset(-BOSS_EXTRUDE14_DEPTH_BACK)):
        with Locations((-0.596477735, 9.107727728)):
            Rectangle(SKETCH16_W, SKETCH16_H)
    extrude(amount=BOSS_EXTRUDE14_DEPTH + BOSS_EXTRUDE14_DEPTH_BACK)


solid = Compound([part.part, body_2.part])
